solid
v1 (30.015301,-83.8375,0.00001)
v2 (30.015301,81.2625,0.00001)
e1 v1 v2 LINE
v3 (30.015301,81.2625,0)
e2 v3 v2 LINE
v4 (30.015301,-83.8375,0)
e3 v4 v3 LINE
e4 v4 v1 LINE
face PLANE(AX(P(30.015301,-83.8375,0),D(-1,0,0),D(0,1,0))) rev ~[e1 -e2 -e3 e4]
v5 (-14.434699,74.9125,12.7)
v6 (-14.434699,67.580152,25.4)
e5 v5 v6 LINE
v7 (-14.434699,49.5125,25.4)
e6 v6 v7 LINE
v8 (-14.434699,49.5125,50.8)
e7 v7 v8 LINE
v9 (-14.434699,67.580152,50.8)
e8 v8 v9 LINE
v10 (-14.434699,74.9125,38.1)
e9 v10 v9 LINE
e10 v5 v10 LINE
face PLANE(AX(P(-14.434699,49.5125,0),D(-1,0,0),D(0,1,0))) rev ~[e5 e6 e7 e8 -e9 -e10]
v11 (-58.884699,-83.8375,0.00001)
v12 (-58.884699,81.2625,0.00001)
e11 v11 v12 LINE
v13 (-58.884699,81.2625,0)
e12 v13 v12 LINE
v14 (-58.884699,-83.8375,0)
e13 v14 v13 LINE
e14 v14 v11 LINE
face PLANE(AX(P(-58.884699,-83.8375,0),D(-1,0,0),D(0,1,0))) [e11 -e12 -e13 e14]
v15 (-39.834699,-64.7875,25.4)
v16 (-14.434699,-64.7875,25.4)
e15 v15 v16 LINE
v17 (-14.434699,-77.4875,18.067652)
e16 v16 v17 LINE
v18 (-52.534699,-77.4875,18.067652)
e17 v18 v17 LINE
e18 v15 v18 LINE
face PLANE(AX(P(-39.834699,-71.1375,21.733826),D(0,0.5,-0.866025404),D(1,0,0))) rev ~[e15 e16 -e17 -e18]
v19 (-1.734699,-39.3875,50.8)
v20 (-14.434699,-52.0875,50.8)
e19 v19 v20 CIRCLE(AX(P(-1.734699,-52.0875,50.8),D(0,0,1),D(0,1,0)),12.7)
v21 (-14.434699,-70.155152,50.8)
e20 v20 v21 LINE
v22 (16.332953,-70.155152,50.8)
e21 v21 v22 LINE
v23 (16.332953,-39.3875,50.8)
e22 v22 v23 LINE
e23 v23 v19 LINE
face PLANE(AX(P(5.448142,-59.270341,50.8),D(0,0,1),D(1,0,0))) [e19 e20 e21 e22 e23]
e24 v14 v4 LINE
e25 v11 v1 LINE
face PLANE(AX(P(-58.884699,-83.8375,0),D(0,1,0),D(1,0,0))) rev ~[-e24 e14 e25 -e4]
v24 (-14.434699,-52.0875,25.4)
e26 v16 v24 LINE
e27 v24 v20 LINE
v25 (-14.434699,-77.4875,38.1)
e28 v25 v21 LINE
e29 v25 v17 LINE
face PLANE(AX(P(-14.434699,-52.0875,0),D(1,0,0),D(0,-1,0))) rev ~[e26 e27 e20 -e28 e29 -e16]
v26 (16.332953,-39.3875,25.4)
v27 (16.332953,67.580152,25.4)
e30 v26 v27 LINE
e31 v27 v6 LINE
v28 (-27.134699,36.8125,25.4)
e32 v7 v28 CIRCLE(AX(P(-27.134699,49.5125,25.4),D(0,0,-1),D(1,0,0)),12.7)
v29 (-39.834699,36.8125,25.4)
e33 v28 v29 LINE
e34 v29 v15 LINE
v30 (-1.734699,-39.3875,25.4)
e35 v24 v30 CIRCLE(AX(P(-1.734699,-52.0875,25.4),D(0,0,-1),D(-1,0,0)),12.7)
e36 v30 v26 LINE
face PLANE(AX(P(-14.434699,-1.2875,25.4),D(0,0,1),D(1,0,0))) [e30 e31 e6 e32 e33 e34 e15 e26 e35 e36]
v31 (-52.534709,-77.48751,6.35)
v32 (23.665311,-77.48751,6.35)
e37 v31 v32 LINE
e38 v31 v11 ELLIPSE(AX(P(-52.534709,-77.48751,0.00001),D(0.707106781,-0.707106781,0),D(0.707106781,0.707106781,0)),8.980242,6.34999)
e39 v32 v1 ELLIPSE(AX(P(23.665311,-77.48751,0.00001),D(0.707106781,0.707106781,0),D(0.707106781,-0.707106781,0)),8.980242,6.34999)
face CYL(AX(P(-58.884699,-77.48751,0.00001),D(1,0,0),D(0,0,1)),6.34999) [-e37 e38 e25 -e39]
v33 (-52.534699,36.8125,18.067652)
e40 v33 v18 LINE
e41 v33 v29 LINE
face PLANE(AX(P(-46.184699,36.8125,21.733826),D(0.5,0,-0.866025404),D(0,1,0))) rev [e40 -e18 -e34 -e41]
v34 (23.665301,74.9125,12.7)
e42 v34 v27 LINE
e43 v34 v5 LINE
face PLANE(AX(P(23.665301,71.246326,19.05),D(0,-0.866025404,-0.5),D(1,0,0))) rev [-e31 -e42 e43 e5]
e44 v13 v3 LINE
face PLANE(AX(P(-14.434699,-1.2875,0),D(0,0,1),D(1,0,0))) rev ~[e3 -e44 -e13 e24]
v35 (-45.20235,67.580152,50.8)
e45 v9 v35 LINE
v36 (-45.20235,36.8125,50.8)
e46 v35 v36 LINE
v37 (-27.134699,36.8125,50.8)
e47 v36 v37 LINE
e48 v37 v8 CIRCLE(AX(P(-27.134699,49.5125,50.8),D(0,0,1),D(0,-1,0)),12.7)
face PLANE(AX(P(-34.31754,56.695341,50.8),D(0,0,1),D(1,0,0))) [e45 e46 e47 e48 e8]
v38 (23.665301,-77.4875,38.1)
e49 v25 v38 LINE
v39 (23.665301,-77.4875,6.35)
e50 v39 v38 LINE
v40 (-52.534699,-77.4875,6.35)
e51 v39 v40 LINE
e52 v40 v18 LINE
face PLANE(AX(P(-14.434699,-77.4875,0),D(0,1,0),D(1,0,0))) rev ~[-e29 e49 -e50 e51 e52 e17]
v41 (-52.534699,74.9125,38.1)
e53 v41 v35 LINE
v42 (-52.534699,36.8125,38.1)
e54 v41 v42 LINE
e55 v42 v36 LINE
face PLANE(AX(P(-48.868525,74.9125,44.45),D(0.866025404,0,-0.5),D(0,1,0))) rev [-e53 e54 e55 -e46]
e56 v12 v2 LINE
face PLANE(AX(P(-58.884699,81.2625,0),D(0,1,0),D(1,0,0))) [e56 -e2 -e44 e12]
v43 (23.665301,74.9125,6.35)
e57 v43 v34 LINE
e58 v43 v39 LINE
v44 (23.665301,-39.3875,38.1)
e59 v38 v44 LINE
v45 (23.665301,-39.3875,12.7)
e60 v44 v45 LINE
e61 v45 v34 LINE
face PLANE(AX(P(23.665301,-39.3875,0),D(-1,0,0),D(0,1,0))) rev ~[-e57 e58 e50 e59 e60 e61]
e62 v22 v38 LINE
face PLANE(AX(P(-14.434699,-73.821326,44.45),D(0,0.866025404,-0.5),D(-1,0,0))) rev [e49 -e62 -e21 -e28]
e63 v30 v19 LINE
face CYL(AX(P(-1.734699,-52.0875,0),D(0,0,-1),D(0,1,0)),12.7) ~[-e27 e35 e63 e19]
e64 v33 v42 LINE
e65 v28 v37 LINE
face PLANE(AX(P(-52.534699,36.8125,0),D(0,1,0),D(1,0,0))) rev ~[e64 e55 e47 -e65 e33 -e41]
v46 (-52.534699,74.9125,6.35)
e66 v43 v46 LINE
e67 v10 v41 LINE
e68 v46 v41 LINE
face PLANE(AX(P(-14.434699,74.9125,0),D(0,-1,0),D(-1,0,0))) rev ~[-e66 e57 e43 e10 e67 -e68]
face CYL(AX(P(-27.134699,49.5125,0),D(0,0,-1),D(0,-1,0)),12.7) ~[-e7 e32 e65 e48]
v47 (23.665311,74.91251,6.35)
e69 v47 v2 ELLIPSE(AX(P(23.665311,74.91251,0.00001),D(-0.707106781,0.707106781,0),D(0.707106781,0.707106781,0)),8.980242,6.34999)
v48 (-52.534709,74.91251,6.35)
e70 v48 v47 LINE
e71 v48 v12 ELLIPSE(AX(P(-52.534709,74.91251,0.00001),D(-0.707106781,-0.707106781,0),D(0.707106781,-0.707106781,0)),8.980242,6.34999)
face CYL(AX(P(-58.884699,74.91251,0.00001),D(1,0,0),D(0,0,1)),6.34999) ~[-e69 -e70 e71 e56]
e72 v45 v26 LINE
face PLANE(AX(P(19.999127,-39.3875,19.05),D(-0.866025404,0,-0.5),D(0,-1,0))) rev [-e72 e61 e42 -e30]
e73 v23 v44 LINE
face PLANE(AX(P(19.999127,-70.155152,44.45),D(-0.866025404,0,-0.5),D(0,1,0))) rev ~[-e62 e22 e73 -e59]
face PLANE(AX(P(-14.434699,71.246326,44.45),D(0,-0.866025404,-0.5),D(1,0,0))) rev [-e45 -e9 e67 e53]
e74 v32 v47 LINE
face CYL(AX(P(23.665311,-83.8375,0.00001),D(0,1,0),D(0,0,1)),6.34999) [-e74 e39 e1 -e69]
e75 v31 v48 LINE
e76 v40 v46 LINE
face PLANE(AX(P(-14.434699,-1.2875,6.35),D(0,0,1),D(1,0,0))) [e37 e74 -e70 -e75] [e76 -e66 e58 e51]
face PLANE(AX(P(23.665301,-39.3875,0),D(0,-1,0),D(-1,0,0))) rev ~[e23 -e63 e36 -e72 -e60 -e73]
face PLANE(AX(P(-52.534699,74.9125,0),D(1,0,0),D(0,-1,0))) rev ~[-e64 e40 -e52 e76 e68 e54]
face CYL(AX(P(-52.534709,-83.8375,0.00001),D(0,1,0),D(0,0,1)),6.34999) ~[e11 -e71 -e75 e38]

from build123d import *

# Parameters (mm, degrees)
F0_W        = 88.9
F0_H        = 165.1
F1_DEPTH    = 6.35
F2_DEPTH    = 25.4
F3_DEPTH    = 50.8
F4_R        = 6.34999
F5_C1_SIZE2 = 7.3323484187
F5_C1_SIZE  = 12.7
F5_C2_SIZE2 = 12.7
F5_C2_SIZE  = 7.3323484187
F5_C3_SIZE2 = 7.3323484187
F5_C3_SIZE  = 12.7
F5_C4_SIZE2 = 7.3323484187
F5_C4_SIZE  = 12.7
F5_C5_SIZE2 = 7.3323484187
F5_C5_SIZE  = 12.7
F5_C6_SIZE2 = 7.3323484187
F5_C6_SIZE  = 12.7
F6_C1_SIZE2 = 7.3323484187
F6_C1_SIZE  = 12.7
F6_C2_SIZE2 = 12.7
F6_C2_SIZE  = 7.3323484187


# Not quite as in the source:
# - a fillet or chamfer is up to 0.001 mm smaller than in the source, because OpenCascade refuses the exact size


with BuildPart() as f1:
    # F0 (on Top) → F1 (new body)
    with BuildSketch(Plane.XY):
        with Locations((-14.4346988976, -1.2875000358)):
            Rectangle(F0_W, F0_H)
        Polygon((-52.5346988976, 36.8124999642), (-52.5346988976, 74.9124999642), (-14.4346988976, 74.9124999642), (23.6653011024, 74.9124999642), (23.6653011024, -39.3875000358), (23.6653011024, -77.4875000358), (-14.4346988976, -77.4875000358), (-52.5346988976, -77.4875000358), align=None, mode=Mode.SUBTRACT)
    extrude(amount=F1_DEPTH)

    # F0 (on Top) → F2 (join)
    with BuildSketch(Plane.XY):
        with BuildLine():
            Line((23.6653011024, 74.9124999642), (-14.4346988976, 74.9124999642))
            Line((-14.4346988976, 74.9124999642), (-14.4346988976, 49.5124999642))
            ThreePointArc((-14.4346988976, 49.5124999642), (-18.1544427765, 40.5322438432), (-27.1346988976, 36.8124999642))
            Line((-27.1346988976, 36.8124999642), (-52.5346988976, 36.8124999642))
            Line((-52.5346988976, 36.8124999642), (-52.5346988976, -77.4875000358))
            Line((-52.5346988976, -77.4875000358), (-14.4346988976, -77.4875000358))
            Line((-14.4346988976, -77.4875000358), (-14.4346988976, -52.0875000358))
            ThreePointArc((-14.4346988976, -52.0875000358), (-10.7149550187, -43.1072439147), (-1.7346988976, -39.3875000358))
            Line((-1.7346988976, -39.3875000358), (23.6653011024, -39.3875000358))
            Line((23.6653011024, -39.3875000358), (23.6653011024, 74.9124999642))
        make_face()
    extrude(amount=F2_DEPTH)

    # F0 (on Top) → F3 (join)
    with BuildSketch(Plane.XY):
        with BuildLine():
            Line((-14.4346988976, 74.9124999642), (-52.5346988976, 74.9124999642))
            Line((-52.5346988976, 74.9124999642), (-52.5346988976, 36.8124999642))
            Line((-52.5346988976, 36.8124999642), (-27.1346988976, 36.8124999642))
            ThreePointArc((-27.1346988976, 36.8124999642), (-18.1544427765, 40.5322438432), (-14.4346988976, 49.5124999642))
            Line((-14.4346988976, 49.5124999642), (-14.4346988976, 74.9124999642))
        make_face()
        with BuildLine():
            Line((23.6653011024, -77.4875000358), (23.6653011024, -39.3875000358))
            Line((23.6653011024, -39.3875000358), (-1.7346988976, -39.3875000358))
            ThreePointArc((-1.7346988976, -39.3875000358), (-10.7149550187, -43.1072439147), (-14.4346988976, -52.0875000358))
            Line((-14.4346988976, -52.0875000358), (-14.4346988976, -77.4875000358))
            Line((-14.4346988976, -77.4875000358), (23.6653011024, -77.4875000358))
        make_face()
    extrude(amount=F3_DEPTH)

    # F4 (radius 6.35 in the source; OpenCascade refuses exactly that, so slightly less here)
    f4_edges = [f1.edges().sort_by_distance(p)[0] for p in [
        (-14.434699, -83.8375, 6.35),
        (-14.434699, 81.2625, 6.35),
        (30.015301, -1.2875, 6.35),
        (-58.884699, -1.2875, 6.35),
    ]]
    fillet(f4_edges, radius=F4_R)

    # F5: chamfer of 12.7 x 7.3323484187 on 6 edges, made by hand

    # F5_c1
    f5_c1_edges = [f1.edges().sort_by_distance(p)[0] for p in [
        (-52.5346988976, 55.8624999642, 50.8),
    ]]
    f5_c1_side = f1.faces().sort_by_distance((-52.5346988976, 55.8624999642, 50.6533530316))[0]
    chamfer(f5_c1_edges, length=F5_C1_SIZE, length2=F5_C1_SIZE2, reference=f5_c1_side)

    # F5_c2
    f5_c2_edges = [f1.edges().sort_by_distance(p)[0] for p in [
        (-52.5346988976, -20.3375000358, 25.4),
    ]]
    f5_c2_side = f1.faces().sort_by_distance((-52.5346988976, -20.3375000358, 25.2533530316))[0]
    chamfer(f5_c2_edges, length=F5_C2_SIZE, length2=F5_C2_SIZE2, reference=f5_c2_side)

    # F5_c3
    f5_c3_edges = [f1.edges().sort_by_distance(p)[0] for p in [
        (4.6153011024, 74.9124999642, 25.4),
    ]]
    f5_c3_side = f1.faces().sort_by_distance((4.6153011024, 74.9124999642, 25.2533530316))[0]
    chamfer(f5_c3_edges, length=F5_C3_SIZE, length2=F5_C3_SIZE2, reference=f5_c3_side)

    # F5_c4
    f5_c4_edges = [f1.edges().sort_by_distance(p)[0] for p in [
        (-29.8185246882, 74.9124999642, 50.8),
    ]]
    f5_c4_side = f1.faces().sort_by_distance((-29.8185246882, 74.9124999642, 50.6533530316))[0]
    chamfer(f5_c4_edges, length=F5_C4_SIZE, length2=F5_C4_SIZE2, reference=f5_c4_side)

    # F5_c5
    f5_c5_edges = [f1.edges().sort_by_distance(p)[0] for p in [
        (23.6653011024, 14.0963257549, 25.4),
    ]]
    f5_c5_side = f1.faces().sort_by_distance((23.6653011024, 14.0963257549, 25.2533530316))[0]
    chamfer(f5_c5_edges, length=F5_C5_SIZE, length2=F5_C5_SIZE2, reference=f5_c5_side)

    # F5_c6
    f5_c6_edges = [f1.edges().sort_by_distance(p)[0] for p in [
        (-27.1346988976, -77.4875000358, 25.4),
    ]]
    f5_c6_side = f1.faces().sort_by_distance((-27.1346988976, -77.3408530674, 25.4))[0]
    chamfer(f5_c6_edges, length=F5_C6_SIZE, length2=F5_C6_SIZE2, reference=f5_c6_side)

    # F6: chamfer of 12.7 x 7.3323484187 on 2 edges, made by hand

    # F6_c1
    f6_c1_edges = [f1.edges().sort_by_distance(p)[0] for p in [
        (4.6153011024, -77.4875000358, 50.8),
    ]]
    f6_c1_side = f1.faces().sort_by_distance((4.6153011024, -77.4875000358, 50.6533530316))[0]
    chamfer(f6_c1_edges, length=F6_C1_SIZE, length2=F6_C1_SIZE2, reference=f6_c1_side)

    # F6_c2
    f6_c2_edges = [f1.edges().sort_by_distance(p)[0] for p in [
        (23.6653011024, -54.7713258264, 50.8),
    ]]
    f6_c2_side = f1.faces().sort_by_distance((23.518654134, -54.7713258264, 50.8))[0]
    chamfer(f6_c2_edges, length=F6_C2_SIZE, length2=F6_C2_SIZE2, reference=f6_c2_side)


solid = f1.part
